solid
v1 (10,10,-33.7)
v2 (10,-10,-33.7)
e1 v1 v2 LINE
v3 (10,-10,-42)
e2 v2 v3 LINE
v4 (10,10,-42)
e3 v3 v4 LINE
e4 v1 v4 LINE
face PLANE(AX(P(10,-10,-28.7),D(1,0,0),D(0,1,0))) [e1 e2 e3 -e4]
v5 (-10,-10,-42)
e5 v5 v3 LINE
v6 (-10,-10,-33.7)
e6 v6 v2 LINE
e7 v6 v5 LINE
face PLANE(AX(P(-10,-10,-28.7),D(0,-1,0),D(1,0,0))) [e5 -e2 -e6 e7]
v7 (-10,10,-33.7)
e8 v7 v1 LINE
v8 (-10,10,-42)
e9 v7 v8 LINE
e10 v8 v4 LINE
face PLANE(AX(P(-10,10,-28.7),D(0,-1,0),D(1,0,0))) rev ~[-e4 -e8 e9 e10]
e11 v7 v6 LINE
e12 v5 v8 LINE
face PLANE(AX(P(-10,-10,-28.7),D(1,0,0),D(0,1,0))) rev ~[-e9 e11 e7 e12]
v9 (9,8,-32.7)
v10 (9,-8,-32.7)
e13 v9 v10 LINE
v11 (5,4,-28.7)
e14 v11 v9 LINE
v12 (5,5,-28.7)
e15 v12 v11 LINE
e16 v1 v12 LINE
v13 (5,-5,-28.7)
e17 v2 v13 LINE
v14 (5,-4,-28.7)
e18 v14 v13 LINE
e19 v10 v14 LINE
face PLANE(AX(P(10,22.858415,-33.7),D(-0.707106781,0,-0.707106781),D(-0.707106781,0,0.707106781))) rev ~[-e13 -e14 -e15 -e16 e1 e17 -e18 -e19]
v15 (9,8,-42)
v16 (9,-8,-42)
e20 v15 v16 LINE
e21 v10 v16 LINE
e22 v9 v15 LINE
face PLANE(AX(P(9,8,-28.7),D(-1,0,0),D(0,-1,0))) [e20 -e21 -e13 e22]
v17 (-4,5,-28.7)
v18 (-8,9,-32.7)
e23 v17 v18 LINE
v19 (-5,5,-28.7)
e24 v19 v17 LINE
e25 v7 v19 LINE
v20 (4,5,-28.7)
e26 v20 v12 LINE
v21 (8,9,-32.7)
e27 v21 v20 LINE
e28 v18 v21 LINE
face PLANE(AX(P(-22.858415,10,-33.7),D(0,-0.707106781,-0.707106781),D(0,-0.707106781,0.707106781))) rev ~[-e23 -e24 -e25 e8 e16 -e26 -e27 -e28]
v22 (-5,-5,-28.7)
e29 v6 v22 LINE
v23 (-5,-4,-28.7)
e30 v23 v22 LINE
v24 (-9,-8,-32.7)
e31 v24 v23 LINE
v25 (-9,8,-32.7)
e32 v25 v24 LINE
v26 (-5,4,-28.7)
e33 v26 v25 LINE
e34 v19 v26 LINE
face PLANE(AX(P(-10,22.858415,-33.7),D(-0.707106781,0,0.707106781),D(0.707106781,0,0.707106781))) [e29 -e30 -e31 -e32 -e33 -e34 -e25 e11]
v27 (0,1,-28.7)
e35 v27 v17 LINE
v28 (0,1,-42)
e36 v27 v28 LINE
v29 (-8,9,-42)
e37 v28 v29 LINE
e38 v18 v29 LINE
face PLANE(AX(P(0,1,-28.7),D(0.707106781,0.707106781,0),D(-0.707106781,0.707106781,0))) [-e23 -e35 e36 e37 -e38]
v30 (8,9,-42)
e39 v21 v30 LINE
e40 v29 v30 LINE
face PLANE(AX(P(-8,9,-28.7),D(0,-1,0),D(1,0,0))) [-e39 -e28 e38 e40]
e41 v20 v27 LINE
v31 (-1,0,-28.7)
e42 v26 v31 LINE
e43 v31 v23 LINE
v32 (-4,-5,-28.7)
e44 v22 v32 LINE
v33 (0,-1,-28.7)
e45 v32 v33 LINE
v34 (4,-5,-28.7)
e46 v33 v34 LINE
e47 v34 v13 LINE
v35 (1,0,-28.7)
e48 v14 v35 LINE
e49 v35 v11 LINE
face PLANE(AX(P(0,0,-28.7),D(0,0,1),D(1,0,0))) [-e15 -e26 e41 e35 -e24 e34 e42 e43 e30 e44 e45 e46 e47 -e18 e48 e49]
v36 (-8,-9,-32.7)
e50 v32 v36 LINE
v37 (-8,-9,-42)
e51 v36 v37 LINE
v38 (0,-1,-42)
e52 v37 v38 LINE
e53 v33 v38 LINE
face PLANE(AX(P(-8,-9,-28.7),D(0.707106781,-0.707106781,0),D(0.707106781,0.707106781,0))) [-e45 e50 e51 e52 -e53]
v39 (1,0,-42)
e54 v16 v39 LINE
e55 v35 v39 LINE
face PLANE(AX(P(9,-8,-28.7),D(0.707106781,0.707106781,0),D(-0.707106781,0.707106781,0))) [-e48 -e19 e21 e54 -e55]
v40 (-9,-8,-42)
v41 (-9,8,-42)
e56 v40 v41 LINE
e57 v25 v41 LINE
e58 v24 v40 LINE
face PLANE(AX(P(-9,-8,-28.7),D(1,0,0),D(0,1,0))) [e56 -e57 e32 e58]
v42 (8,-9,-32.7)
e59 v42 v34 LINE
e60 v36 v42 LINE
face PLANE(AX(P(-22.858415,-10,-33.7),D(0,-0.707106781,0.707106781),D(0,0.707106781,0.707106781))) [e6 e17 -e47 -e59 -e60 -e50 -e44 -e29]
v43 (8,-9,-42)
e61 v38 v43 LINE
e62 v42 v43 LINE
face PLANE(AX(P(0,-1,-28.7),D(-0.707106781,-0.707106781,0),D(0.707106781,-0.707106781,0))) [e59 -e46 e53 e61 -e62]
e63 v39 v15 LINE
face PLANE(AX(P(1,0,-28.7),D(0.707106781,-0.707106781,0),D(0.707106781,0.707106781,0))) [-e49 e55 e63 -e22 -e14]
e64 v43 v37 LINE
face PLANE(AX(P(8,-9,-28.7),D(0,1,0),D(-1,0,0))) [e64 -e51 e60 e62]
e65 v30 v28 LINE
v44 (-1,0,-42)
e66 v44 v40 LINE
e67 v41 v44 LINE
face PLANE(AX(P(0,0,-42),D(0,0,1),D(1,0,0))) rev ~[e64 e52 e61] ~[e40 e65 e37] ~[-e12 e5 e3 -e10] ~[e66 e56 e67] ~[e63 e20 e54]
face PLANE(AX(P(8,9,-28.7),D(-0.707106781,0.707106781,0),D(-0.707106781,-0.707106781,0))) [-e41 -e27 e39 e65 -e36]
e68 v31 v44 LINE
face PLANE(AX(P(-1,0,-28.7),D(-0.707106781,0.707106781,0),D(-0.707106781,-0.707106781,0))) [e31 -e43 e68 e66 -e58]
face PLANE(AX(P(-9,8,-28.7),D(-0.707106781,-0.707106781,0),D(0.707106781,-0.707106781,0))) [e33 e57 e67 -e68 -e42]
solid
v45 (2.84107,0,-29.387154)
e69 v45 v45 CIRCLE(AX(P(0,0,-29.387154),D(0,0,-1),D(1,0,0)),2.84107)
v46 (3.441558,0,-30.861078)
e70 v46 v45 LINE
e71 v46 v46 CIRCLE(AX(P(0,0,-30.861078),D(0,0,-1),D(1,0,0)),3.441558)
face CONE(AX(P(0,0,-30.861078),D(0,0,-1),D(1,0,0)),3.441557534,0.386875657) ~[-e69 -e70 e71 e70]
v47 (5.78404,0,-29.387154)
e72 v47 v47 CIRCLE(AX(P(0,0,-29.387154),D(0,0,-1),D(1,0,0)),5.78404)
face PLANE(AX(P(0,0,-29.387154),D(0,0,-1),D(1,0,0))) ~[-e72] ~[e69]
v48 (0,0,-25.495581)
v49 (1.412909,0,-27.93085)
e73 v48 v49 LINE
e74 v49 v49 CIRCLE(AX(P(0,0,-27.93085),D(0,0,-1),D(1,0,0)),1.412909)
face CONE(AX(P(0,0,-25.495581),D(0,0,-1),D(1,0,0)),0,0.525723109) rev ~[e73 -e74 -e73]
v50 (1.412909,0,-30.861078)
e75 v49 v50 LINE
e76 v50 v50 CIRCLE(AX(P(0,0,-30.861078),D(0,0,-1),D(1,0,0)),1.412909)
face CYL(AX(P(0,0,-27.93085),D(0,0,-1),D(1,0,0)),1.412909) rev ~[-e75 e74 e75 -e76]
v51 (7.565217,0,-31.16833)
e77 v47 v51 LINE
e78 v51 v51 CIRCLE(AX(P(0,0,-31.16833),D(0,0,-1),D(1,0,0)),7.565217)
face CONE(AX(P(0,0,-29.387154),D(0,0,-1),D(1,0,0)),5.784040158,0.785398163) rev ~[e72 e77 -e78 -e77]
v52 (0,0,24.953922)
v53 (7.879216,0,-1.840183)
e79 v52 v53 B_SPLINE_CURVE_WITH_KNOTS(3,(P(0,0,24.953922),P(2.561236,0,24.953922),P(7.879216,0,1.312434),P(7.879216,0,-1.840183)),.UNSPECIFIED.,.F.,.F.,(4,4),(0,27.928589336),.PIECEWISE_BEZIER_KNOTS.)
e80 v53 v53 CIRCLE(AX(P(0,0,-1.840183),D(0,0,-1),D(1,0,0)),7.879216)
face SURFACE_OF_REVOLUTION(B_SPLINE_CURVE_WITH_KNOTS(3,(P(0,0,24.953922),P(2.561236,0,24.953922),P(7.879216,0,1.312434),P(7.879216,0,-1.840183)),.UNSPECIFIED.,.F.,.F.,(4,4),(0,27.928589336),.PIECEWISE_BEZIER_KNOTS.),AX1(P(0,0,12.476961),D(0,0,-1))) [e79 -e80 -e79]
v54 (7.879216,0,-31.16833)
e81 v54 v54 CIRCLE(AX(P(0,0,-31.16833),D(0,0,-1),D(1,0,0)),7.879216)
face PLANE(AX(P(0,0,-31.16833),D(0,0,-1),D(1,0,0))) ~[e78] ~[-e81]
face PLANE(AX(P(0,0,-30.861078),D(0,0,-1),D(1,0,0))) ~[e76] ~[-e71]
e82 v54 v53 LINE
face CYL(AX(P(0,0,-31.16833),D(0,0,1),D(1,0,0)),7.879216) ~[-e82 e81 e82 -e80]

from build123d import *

# Parameters (mm, degrees)
F3_START    = -28.7
F2_W        = 20
F2_H        = 20
F3_DEPTH    = 13.3
F4_T1_DEPTH = 45.7168298797
F4_T3_DEPTH = 45.7168298797


# Not quite as in the source:
# - a fillet or chamfer that OpenCascade refuses, or shapes differently, is made with other operations: its cross-section is extruded or revolved along the edge and cut away or added


with BuildPart() as f1:
    # F0 (on Front) → F1 (revolve)
    with BuildSketch(Plane.XZ):
        with BuildLine():
            Line((2.8410700233, -29.3871536851), (5.784040158, -29.3871536851))
            Line((5.784040158, -29.3871536851), (7.5652169337, -31.1683304608))
            Line((7.5652169337, -31.1683304608), (7.879216224, -31.1683304608))
            Line((7.879216224, -31.1683304608), (7.879216224, -1.8401825801))
            add(Edge.make_bspline(
                [(0, 24.9539222568), (2.5612364989, 24.9539222568), (7.879216224, 1.3124344186), (7.879216224, -1.8401825801)],
                knots=[0, 0, 0, 0, 27.9285893363, 27.9285893363, 27.9285893363, 27.9285893363], degree=3))
            Line((0, 24.9539222568), (0, 0))
            Line((0, 0), (0, -25.4955813289))
            Line((0, -25.4955813289), (1.4129093615, -27.9308501631))
            Line((1.4129093615, -27.9308501631), (1.4129093615, -30.8610778302))
            Line((1.4129093615, -30.8610778302), (3.4415575342, -30.8610778302))
            Line((3.4415575342, -30.8610778302), (2.8410700233, -29.3871536851))
        make_face()
    revolve(axis=Axis((0, 0, 12.4769611284), (0, 0, -1)))


with BuildPart() as f3:
    # F2 (on Top) → F3 (new body)
    with BuildSketch(Plane.XY.offset(F3_START)):
        Rectangle(F2_W, F2_H)
        Polygon((-1, 0), (-8.9999996126, -7.9999996126), (-8.9999996126, 7.9999996126), align=None, mode=Mode.SUBTRACT)
        Polygon((0, -1), (7.9999996126, -8.9999996126), (-7.9999996126, -8.9999996126), align=None, mode=Mode.SUBTRACT)
        Polygon((-7.9999996126, 8.9999996126), (7.9999996126, 8.9999996126), (0, 1), align=None, mode=Mode.SUBTRACT)
        Polygon((8.9999996126, 7.9999996126), (8.9999996126, -7.9999996126), (1, 0), align=None, mode=Mode.SUBTRACT)
    extrude(amount=-F3_DEPTH)

    # F4: chamfer of 5 on 4 edges, made by hand

    # F4_s2 → F4_t1 (cut)
    with BuildSketch(Plane.XZ.offset(-22.8584149398)):
        Polygon((10, -33.7), (5, -28.7), (10, -28.7), align=None)
        Polygon((-10, -33.7), (-5, -28.7), (-10, -28.7), align=None)
    extrude(amount=F4_T1_DEPTH, mode=Mode.SUBTRACT)

    # F4_s4 → F4_t3 (cut)
    with BuildSketch(Plane.YZ.offset(-22.8584149398)):
        Polygon((10, -33.7), (5, -28.7), (10, -28.7), align=None)
        Polygon((-10, -33.7), (-5, -28.7), (-10, -28.7), align=None)
    extrude(amount=F4_T3_DEPTH, mode=Mode.SUBTRACT)


solid = Compound([f1.part, f3.part])
